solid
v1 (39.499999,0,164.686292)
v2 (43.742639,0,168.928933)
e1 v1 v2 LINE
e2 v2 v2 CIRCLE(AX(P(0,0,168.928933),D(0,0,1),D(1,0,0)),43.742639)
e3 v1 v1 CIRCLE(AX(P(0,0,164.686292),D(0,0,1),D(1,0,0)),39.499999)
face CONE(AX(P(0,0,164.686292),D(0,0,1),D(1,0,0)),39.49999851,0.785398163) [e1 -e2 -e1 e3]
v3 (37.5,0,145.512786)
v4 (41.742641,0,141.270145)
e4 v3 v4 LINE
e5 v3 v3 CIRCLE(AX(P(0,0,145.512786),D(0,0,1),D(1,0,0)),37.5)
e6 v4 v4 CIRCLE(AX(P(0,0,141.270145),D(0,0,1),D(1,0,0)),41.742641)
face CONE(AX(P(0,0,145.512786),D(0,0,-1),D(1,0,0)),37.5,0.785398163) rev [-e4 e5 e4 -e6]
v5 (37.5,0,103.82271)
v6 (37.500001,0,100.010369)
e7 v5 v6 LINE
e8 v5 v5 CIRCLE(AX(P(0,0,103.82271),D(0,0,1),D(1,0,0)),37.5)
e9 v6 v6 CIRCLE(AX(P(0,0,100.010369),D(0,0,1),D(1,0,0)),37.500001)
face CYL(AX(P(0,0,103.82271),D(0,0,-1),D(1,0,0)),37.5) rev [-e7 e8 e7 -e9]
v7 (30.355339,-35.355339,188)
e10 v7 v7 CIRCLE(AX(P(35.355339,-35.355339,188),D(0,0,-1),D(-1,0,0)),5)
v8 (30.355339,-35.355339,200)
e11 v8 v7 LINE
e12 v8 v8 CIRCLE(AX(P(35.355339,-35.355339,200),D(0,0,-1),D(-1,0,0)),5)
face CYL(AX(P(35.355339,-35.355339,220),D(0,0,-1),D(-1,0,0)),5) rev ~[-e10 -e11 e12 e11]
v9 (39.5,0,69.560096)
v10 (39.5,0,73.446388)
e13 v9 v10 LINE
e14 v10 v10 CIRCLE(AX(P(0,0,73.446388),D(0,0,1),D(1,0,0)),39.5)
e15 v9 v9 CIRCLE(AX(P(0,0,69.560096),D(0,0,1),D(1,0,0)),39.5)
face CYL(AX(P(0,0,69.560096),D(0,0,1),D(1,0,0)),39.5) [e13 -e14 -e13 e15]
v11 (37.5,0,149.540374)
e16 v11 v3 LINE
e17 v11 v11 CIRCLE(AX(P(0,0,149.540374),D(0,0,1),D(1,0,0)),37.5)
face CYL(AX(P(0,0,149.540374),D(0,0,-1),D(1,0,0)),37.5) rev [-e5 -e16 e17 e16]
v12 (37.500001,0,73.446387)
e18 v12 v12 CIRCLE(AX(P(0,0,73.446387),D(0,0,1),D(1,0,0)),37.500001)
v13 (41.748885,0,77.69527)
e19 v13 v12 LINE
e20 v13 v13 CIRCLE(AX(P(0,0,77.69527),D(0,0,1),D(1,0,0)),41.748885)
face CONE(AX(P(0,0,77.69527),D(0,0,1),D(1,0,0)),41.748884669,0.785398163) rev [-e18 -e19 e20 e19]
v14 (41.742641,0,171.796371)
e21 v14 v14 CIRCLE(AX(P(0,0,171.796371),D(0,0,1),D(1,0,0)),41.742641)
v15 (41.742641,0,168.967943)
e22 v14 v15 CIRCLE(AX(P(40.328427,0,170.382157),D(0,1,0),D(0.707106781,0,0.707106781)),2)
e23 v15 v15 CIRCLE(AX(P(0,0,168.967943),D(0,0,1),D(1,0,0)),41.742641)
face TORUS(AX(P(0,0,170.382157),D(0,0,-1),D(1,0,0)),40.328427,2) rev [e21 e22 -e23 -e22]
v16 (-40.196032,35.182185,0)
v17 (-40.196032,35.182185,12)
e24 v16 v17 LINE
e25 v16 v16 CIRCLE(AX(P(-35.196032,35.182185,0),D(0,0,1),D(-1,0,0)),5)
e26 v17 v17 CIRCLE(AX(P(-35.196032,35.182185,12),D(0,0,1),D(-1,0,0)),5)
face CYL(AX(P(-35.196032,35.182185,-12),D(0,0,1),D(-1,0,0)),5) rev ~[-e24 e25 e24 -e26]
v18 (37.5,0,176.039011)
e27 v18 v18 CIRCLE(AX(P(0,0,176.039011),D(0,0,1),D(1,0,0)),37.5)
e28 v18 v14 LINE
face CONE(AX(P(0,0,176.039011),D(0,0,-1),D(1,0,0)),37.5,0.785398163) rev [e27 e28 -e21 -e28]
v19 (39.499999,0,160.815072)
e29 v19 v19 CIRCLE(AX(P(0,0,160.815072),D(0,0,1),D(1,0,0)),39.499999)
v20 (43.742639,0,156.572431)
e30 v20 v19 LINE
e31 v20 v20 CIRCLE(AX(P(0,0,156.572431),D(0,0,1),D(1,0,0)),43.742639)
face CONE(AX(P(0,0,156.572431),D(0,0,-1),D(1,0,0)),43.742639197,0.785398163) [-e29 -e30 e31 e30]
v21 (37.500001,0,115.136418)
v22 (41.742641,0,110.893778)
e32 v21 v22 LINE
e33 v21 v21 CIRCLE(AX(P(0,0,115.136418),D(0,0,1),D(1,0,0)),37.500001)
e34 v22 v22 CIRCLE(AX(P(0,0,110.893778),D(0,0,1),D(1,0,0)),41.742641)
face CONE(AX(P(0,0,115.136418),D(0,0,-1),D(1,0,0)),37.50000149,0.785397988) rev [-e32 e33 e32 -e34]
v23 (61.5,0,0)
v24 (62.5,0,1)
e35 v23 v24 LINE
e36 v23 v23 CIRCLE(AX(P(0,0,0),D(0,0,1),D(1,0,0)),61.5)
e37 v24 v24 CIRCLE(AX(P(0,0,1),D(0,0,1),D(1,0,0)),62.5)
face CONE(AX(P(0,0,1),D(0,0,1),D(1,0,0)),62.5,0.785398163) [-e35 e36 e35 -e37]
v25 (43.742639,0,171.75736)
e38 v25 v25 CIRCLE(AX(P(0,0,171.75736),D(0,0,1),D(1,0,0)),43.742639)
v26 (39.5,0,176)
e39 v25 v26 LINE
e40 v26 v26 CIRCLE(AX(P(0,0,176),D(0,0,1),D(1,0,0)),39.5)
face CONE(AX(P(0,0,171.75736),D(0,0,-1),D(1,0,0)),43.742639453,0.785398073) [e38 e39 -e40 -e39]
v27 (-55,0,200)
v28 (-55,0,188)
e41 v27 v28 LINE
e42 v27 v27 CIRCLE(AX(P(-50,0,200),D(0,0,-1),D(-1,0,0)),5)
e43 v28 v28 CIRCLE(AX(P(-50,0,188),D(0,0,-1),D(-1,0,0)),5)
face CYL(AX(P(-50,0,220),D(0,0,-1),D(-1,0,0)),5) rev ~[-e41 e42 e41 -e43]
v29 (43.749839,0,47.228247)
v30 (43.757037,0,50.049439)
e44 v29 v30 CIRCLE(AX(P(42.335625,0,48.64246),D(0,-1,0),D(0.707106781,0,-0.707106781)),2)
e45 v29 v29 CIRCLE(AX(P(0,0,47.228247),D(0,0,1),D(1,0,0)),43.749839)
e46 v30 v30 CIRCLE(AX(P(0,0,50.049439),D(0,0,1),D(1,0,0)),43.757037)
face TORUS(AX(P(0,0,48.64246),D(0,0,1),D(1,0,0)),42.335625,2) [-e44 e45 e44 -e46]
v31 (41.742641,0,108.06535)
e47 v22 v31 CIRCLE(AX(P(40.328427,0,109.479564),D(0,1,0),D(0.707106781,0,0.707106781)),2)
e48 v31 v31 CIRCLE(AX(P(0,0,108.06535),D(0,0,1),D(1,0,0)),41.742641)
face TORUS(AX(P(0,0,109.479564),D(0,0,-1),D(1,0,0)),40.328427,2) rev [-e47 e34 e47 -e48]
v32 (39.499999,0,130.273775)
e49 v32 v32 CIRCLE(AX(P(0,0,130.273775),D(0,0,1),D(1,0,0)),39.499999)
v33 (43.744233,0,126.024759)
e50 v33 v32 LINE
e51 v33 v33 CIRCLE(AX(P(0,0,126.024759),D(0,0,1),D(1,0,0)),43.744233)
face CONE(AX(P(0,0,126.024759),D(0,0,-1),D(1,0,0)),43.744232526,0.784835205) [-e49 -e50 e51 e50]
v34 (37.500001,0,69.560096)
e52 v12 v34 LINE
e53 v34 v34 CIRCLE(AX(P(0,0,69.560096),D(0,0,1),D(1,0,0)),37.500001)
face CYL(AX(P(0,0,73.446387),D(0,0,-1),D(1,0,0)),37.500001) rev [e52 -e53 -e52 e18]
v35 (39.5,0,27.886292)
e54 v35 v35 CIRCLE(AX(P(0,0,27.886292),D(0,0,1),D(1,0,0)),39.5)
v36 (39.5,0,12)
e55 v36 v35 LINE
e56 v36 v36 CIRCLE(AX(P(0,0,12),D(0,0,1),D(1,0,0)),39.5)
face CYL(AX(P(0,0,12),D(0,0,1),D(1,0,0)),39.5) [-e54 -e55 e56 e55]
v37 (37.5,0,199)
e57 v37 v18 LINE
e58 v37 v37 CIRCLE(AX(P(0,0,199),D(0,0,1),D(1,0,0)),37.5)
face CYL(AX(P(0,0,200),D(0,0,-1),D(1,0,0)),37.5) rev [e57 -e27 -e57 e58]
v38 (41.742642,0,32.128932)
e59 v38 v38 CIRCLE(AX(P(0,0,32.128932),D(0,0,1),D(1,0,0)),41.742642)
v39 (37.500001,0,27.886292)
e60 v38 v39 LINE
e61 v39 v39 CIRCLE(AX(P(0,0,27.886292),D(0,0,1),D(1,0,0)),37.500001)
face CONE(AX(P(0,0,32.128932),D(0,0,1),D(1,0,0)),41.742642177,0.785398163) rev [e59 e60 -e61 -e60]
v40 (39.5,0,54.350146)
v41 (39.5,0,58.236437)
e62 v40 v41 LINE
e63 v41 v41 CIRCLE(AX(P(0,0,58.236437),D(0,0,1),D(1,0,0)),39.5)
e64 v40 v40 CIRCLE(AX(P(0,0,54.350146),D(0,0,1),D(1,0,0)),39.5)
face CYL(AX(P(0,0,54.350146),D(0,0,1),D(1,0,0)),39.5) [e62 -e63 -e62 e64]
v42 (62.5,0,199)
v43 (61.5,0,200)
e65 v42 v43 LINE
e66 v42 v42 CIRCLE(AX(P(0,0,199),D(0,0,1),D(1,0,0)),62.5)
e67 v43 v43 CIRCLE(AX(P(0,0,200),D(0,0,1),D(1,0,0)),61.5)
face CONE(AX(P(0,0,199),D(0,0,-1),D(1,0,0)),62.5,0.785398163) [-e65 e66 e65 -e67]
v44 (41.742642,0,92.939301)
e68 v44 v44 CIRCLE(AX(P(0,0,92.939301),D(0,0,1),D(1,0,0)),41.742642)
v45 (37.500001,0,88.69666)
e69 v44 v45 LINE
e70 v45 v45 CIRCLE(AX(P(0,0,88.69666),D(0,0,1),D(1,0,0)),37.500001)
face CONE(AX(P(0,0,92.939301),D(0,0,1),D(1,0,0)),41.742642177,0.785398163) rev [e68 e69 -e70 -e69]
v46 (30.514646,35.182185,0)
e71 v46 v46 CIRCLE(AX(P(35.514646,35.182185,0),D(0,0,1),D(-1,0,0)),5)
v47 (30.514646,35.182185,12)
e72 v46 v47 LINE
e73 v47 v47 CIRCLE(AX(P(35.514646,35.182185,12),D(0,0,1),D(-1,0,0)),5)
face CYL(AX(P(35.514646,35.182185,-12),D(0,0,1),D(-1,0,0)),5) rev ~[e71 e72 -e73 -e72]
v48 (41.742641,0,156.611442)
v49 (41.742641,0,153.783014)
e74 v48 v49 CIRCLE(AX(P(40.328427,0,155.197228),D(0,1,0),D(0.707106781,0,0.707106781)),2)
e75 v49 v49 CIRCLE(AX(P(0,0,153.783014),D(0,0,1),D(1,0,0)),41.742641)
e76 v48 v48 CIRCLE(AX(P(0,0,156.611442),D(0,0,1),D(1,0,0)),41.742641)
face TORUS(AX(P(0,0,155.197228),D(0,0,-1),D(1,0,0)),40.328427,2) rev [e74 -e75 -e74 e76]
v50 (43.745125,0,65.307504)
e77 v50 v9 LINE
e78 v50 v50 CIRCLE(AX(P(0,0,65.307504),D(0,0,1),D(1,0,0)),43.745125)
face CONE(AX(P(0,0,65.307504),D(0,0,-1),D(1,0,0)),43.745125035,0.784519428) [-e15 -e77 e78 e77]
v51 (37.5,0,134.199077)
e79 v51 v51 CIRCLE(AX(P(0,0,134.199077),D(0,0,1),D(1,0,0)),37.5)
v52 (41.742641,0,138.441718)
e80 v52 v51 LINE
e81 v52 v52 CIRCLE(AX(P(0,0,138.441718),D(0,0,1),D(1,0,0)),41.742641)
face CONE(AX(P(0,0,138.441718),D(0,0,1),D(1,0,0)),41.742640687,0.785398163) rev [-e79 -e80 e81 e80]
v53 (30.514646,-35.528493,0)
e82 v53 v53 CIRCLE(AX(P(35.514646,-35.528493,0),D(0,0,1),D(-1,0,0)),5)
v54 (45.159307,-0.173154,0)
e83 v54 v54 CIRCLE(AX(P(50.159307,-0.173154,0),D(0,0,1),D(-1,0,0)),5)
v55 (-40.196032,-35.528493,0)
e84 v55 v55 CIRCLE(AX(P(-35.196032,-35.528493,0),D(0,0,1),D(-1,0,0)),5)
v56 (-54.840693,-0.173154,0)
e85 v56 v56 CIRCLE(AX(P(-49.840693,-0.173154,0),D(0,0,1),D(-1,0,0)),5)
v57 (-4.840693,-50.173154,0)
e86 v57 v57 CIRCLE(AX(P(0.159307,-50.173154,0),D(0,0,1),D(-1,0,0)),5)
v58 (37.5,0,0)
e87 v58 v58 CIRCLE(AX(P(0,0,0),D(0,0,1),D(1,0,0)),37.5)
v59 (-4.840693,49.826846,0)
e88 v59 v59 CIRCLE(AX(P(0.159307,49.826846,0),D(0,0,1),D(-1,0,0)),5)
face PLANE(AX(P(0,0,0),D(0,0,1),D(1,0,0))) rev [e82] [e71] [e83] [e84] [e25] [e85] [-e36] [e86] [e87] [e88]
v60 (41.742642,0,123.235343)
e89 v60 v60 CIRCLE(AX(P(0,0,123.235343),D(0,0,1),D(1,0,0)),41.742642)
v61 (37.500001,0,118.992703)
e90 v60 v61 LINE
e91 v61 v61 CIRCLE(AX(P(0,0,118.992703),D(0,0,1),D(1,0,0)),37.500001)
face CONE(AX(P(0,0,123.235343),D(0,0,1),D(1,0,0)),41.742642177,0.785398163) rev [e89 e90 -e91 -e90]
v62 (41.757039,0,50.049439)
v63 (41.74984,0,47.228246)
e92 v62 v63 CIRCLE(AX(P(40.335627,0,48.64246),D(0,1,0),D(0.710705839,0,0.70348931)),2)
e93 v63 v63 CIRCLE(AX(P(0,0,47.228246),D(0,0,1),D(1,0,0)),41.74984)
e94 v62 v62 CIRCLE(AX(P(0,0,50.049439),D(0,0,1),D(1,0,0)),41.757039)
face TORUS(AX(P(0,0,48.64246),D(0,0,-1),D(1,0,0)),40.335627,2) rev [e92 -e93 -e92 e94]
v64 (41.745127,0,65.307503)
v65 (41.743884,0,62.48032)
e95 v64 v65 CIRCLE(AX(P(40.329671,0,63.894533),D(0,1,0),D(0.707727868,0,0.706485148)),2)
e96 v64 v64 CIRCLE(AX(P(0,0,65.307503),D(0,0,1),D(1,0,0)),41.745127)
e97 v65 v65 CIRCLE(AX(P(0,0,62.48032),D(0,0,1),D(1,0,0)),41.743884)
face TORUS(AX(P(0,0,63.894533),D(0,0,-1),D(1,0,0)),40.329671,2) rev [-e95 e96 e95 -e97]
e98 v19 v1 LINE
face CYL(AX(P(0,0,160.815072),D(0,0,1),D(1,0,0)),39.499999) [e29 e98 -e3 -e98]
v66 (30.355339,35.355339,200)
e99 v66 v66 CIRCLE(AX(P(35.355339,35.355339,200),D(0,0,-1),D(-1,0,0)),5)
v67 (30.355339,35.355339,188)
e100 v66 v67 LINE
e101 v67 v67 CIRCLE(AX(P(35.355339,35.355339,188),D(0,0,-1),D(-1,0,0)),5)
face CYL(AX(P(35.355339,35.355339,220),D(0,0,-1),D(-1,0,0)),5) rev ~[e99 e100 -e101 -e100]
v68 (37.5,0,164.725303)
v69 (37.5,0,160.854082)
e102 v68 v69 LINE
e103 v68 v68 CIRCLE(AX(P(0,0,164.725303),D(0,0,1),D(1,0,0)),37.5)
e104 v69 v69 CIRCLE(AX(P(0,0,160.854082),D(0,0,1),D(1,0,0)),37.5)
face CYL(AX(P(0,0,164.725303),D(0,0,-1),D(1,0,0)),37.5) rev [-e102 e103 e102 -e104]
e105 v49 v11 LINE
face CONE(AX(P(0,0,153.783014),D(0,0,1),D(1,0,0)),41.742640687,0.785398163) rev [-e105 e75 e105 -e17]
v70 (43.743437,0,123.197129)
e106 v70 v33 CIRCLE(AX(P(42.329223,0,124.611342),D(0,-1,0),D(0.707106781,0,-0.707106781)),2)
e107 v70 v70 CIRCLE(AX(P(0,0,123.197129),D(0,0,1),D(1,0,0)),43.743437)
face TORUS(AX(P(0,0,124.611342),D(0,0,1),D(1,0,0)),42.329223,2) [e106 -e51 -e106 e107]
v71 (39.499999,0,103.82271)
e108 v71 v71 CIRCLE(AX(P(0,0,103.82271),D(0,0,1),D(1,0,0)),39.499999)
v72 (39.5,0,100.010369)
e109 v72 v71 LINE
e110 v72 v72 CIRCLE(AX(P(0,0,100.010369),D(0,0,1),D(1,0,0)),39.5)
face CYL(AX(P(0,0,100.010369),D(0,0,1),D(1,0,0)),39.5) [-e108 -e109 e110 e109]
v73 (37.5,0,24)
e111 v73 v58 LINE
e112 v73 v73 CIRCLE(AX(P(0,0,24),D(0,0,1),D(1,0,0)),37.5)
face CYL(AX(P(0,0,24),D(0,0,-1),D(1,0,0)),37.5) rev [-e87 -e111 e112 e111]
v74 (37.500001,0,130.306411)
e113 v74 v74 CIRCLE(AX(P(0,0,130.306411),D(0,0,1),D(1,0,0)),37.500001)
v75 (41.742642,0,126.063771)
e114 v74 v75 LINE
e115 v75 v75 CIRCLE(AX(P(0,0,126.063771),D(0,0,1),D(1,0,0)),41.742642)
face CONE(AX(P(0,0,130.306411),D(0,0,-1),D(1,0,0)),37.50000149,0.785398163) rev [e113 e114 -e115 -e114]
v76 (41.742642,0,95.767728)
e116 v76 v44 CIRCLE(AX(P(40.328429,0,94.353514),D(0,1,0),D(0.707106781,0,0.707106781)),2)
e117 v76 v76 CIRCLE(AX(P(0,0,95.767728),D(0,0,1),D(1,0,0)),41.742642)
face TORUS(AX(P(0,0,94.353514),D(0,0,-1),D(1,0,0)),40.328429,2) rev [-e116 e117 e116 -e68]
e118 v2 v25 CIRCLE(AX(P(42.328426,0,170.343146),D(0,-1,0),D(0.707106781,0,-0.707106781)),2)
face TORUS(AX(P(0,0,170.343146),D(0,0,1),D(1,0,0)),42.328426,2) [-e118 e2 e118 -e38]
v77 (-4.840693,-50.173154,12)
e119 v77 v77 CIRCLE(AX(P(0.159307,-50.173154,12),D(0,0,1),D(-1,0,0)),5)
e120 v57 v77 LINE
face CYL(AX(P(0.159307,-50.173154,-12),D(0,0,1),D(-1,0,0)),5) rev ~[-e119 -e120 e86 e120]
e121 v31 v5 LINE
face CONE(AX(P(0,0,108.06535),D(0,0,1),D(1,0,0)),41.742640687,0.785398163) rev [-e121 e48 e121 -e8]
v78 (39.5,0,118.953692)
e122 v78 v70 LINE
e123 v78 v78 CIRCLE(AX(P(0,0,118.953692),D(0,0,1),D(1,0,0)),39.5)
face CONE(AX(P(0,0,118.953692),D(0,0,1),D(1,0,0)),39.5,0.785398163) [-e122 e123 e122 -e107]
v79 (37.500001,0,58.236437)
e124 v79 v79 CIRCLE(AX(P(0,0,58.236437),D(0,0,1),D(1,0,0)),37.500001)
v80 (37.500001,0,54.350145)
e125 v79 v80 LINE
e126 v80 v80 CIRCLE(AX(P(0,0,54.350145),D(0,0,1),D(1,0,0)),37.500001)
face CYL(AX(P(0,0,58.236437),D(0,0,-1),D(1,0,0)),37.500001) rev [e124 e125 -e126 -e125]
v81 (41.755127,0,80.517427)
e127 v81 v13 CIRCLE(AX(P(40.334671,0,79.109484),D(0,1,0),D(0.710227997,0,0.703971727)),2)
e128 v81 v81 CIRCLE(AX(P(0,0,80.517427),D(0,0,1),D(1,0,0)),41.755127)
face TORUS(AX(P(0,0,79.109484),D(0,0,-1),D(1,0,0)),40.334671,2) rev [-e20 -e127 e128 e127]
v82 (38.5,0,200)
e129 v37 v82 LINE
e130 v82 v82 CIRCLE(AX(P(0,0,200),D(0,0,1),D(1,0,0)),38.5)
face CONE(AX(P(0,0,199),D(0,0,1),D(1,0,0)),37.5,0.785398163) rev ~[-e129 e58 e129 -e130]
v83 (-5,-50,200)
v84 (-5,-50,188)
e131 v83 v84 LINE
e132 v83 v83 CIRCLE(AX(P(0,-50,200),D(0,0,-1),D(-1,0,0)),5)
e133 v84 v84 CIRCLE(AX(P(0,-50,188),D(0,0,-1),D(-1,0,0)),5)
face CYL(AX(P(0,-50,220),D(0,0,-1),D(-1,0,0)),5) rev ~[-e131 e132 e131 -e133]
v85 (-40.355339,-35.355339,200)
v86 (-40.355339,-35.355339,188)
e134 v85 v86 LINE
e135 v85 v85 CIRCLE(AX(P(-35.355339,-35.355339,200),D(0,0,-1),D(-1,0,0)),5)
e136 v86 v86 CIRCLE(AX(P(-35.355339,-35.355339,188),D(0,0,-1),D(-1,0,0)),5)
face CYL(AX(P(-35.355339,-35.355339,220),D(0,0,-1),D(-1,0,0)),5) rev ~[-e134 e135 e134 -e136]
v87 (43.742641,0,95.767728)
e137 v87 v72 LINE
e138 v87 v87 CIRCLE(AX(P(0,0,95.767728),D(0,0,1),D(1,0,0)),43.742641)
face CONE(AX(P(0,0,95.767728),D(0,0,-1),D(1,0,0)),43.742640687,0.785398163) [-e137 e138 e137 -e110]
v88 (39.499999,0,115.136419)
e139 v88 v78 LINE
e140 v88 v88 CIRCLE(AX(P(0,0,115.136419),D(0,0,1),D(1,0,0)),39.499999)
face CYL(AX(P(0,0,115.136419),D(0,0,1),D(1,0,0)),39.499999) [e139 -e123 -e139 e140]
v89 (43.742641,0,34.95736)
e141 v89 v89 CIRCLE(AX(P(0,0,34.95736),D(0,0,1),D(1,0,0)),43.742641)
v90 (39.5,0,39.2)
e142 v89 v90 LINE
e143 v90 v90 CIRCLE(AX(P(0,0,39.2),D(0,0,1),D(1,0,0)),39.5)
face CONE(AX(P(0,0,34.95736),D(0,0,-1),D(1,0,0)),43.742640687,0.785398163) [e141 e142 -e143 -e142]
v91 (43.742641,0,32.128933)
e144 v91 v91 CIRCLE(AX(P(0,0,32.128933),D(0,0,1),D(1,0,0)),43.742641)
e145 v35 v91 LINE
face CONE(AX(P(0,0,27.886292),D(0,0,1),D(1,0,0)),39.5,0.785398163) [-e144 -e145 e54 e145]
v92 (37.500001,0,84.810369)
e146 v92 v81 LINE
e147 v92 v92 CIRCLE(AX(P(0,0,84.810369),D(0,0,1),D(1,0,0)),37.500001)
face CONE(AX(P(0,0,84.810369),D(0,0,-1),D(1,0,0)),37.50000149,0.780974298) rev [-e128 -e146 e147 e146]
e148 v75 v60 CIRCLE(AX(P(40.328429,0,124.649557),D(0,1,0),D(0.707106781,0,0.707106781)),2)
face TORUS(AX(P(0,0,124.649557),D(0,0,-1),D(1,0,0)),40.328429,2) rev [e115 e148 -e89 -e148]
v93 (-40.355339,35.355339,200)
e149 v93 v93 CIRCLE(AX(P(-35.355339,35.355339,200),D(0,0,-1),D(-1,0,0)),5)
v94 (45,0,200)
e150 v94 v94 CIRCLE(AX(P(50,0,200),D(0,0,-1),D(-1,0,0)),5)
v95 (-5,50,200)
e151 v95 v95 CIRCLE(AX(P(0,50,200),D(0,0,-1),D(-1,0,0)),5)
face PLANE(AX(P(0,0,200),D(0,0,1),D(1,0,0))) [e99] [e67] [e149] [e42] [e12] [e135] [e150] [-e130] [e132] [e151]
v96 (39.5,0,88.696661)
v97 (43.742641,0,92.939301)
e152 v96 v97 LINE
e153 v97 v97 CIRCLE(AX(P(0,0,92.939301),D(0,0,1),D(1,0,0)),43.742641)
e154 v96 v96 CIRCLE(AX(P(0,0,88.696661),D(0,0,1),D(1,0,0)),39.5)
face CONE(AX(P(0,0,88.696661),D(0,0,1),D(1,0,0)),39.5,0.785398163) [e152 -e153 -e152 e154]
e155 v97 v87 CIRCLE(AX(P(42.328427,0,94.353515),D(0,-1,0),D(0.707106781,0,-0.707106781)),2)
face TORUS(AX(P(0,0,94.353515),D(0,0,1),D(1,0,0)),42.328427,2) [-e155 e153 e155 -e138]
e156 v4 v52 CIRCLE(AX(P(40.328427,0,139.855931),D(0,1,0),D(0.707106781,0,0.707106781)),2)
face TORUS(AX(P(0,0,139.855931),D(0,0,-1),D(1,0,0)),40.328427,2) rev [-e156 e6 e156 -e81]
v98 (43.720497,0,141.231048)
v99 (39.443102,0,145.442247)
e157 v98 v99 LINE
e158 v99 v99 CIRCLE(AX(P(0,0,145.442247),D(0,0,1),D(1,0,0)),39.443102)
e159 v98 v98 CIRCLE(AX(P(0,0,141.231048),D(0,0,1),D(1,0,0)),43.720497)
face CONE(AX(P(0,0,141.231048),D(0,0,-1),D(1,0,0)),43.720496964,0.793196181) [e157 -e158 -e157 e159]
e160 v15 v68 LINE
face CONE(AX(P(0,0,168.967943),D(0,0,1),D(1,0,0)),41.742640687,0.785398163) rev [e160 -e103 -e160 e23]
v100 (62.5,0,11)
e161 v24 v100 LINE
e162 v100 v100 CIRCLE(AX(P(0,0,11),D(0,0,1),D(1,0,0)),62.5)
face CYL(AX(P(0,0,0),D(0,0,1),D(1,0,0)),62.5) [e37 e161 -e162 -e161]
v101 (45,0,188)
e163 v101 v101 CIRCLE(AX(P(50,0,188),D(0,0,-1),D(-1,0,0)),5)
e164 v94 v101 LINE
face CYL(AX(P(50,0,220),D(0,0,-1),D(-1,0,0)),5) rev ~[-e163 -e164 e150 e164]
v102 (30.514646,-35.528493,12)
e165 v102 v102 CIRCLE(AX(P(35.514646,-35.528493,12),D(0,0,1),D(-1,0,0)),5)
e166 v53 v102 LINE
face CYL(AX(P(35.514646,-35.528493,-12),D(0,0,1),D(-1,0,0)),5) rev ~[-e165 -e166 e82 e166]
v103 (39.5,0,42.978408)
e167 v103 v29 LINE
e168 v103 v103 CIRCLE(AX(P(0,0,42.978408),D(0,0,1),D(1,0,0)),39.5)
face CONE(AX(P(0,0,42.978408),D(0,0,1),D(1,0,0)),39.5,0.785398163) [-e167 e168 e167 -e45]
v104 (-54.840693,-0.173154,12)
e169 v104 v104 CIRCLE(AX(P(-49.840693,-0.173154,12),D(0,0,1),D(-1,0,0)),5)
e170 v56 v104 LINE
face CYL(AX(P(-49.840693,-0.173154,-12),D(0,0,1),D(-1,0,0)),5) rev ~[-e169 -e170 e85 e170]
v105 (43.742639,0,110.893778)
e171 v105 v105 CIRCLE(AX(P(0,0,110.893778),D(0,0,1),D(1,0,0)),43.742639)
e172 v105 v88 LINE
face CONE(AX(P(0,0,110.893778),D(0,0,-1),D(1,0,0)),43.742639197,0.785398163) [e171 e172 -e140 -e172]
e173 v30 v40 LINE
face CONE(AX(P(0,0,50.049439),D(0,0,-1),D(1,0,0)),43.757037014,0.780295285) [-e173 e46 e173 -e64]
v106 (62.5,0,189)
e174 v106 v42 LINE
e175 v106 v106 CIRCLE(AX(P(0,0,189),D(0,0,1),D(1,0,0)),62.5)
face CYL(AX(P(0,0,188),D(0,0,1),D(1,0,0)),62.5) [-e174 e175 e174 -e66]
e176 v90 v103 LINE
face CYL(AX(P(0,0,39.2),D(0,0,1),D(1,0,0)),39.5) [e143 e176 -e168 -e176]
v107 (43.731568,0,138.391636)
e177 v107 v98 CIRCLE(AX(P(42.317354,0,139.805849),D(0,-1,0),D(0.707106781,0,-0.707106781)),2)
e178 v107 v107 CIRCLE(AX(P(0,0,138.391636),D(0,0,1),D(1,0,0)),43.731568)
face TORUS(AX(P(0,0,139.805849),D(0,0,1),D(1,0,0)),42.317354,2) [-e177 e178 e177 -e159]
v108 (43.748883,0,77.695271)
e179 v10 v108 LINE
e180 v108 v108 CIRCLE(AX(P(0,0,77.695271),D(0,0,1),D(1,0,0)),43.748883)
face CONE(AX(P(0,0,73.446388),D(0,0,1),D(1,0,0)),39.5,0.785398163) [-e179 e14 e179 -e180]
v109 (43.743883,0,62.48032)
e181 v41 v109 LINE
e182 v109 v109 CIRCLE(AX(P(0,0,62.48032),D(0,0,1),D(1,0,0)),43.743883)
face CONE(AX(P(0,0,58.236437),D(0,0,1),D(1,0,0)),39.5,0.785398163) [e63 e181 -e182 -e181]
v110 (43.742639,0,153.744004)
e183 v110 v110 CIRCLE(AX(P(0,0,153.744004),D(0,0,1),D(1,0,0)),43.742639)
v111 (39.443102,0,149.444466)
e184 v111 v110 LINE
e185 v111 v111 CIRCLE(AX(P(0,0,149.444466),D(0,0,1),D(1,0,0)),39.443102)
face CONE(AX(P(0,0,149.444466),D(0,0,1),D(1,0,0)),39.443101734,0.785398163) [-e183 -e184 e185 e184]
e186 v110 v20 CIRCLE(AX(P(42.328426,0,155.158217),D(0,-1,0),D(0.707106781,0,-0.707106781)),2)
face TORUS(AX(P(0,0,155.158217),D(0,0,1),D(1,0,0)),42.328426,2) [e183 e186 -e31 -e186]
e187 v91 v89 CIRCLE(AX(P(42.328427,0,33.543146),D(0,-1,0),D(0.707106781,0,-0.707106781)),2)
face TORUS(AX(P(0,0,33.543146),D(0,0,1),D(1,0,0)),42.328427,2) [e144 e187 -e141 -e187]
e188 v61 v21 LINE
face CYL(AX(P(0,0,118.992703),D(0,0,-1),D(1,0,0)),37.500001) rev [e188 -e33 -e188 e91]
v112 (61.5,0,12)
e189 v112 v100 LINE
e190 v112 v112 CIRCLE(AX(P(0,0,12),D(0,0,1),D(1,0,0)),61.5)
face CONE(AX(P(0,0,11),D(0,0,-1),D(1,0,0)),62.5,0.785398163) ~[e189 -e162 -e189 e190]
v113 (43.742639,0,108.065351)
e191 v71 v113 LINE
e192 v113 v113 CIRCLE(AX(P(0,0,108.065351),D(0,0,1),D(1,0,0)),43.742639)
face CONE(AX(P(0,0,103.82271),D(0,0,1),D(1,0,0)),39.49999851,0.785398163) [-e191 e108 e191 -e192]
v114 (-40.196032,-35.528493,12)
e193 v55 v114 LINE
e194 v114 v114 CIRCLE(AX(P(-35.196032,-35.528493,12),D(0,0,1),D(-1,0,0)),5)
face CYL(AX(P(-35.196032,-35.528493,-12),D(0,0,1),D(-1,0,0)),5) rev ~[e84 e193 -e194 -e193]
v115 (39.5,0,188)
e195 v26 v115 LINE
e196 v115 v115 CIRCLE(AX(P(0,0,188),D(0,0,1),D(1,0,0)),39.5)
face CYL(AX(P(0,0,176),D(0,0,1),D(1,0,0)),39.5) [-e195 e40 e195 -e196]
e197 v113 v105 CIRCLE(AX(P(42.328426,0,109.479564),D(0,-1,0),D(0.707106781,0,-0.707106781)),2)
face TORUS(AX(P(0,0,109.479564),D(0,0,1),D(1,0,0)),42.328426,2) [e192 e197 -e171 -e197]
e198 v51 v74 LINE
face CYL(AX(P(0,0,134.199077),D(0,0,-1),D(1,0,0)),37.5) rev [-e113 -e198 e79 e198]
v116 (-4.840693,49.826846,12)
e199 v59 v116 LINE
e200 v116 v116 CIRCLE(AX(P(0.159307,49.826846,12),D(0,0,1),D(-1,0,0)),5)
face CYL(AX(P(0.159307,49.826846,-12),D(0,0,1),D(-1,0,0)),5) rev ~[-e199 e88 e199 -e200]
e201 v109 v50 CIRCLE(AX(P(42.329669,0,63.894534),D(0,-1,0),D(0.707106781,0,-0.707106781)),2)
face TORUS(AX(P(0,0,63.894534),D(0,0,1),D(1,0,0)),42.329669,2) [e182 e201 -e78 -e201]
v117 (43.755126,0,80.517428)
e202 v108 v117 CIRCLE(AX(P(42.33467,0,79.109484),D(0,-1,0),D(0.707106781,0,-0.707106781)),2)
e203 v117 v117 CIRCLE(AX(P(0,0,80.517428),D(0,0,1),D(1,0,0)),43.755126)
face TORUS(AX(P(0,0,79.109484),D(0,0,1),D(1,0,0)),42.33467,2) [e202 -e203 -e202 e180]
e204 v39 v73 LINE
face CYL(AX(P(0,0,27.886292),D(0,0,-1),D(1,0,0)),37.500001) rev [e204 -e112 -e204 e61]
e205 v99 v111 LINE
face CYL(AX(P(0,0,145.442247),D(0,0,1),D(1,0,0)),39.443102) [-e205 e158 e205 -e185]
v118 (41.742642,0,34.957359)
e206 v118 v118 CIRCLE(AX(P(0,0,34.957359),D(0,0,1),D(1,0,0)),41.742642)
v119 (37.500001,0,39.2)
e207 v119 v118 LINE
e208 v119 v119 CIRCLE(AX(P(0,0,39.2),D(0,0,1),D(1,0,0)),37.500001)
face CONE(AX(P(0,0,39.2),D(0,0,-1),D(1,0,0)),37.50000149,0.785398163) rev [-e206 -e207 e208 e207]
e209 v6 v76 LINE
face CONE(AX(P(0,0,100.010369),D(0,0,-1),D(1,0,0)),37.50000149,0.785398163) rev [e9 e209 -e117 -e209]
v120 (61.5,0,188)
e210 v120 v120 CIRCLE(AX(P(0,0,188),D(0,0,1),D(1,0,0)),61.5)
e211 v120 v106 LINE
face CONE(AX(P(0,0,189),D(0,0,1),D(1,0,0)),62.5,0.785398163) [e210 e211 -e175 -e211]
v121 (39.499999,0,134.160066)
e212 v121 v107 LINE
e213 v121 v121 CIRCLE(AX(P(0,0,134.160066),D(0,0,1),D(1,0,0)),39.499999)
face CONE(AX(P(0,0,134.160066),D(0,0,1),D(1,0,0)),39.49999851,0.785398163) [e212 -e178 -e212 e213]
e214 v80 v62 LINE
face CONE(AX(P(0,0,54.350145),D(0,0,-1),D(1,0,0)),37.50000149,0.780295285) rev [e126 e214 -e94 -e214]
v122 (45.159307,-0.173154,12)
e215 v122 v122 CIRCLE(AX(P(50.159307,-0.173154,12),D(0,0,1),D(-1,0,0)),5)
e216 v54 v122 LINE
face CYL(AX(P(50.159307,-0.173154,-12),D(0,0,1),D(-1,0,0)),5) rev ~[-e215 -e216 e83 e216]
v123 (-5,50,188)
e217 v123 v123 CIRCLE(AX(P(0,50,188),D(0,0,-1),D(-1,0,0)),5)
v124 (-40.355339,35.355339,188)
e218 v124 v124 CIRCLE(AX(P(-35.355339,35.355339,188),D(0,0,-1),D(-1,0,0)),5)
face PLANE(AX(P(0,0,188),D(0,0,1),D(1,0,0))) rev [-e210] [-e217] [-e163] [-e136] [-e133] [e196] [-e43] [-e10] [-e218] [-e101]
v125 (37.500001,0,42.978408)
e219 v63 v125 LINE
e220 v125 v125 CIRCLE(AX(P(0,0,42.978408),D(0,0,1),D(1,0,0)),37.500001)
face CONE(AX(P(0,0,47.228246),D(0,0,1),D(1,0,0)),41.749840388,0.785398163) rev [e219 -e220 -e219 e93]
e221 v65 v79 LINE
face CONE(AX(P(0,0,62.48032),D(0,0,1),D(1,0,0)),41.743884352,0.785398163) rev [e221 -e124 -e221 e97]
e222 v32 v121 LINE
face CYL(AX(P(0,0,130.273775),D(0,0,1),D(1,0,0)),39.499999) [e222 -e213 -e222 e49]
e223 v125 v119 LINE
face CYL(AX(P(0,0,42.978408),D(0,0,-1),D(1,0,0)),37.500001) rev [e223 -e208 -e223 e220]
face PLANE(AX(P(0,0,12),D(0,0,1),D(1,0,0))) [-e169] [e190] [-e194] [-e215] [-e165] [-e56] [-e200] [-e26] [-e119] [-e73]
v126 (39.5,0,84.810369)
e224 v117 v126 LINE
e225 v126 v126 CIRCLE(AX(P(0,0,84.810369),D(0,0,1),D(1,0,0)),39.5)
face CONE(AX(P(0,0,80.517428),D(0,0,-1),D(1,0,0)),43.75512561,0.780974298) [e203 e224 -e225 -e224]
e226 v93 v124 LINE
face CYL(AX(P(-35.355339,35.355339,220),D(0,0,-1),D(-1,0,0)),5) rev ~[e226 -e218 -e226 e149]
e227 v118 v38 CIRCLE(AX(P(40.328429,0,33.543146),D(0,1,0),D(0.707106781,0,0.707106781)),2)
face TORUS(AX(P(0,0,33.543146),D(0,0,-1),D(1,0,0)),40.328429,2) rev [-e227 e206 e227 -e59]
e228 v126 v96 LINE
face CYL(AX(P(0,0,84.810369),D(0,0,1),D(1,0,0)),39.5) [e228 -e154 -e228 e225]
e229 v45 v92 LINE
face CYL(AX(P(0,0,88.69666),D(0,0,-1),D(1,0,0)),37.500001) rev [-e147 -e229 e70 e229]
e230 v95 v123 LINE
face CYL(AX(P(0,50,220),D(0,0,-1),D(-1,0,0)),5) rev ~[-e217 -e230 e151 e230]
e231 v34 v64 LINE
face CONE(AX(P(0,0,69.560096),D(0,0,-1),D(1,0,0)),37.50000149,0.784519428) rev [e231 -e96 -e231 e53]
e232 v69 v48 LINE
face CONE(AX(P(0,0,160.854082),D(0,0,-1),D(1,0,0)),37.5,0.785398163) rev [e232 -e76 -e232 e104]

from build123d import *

# Parameters (mm, degrees)
F3_D     = 10
F3_DEPTH = 20
F3_TIP   = 3.0043030951
F5_D     = 10
F5_DEPTH = 12
F5_TIP   = 3.0043030951
F6_SIZE  = 1


# Not quite as in the source:
# - ends of sketch curves that miss each other by under 0.0002 mm in the source are joined
# - a feature names something its author has since deleted; it is built from what else it names


with BuildPart() as f1:
    # F0 (on Front) → F1 (revolve)
    with BuildSketch(Plane.XZ):
        Polygon((37.5, 200), (37.5, 188), (39.5, 188), (49.1224490106, 188), (62.5, 188), (62.5, 200), align=None)
        Polygon((37.5, 12), (37.5, 0), (62.5, 0), (62.5, 12), (39.5, 12), align=None)
        with BuildLine():
            Line((37.5, 24), (37.5, 12))
            Line((37.5, 12), (39.5, 12))
            Line((39.5, 12), (39.5, 24))
            Line((39.5, 24), (39.5, 27.8862919658))
            Line((39.5, 27.8862919658), (43.7426406871, 32.128932653))
            ThreePointArc((43.7426406871, 32.128932653), (44.3284271247, 33.5431462153), (43.7426406871, 34.9573597777))
            Line((43.7426406871, 34.9573597777), (39.5, 39.2000004648))
            Line((39.5, 39.2000004648), (39.5, 42.9784080237))
            Line((39.5, 42.9784080237), (43.7498388975, 47.2282469212))
            ThreePointArc((43.7498388975, 47.2282469212), (44.3356188252, 48.6373576102), (43.7570370141, 50.0494391041))
            Line((43.7570370141, 50.0494391041), (39.5, 54.350145626))
            Line((39.5, 54.350145626), (39.5, 58.236437127))
            Line((39.5, 58.236437127), (43.7438828615, 62.4803199885))
            ThreePointArc((43.7438828615, 62.4803199885), (44.329669106, 63.8936548151), (43.7451250353, 65.3075038473))
            Line((43.7451250353, 65.3075038473), (39.5, 69.5600961327))
            Line((39.5, 69.5600961327), (39.5, 73.4463876337))
            Line((39.5, 73.4463876337), (43.7488831793, 77.695270813))
            ThreePointArc((43.7488831793, 77.695270813), (44.3346647243, 79.1050605139), (43.7551256104, 80.5174278297))
            Line((43.7551256104, 80.5174278297), (39.5, 84.8103691815))
            Line((39.5, 84.8103691815), (39.5, 88.6966606826))
            Line((39.5, 88.6966606826), (43.7426406871, 92.9393013697))
            ThreePointArc((43.7426406871, 92.9393013697), (44.3284271247, 94.3535149321), (43.7426406871, 95.7677284944))
            Line((43.7426406871, 95.7677284944), (39.5, 100.0103691815))
            Line((39.5, 100.0103691815), (39.4999985099, 103.8227102011))
            Line((39.4999985099, 103.8227102011), (43.742639197, 108.0653508883))
            ThreePointArc((43.742639197, 108.0653508883), (44.3284256346, 109.4795644506), (43.742639197, 110.893778013))
            Line((43.742639197, 110.893778013), (39.4999985099, 115.1364187001))
            Line((39.4999985099, 115.1364187001), (39.5, 118.9536920041))
            Line((39.5, 118.9536920041), (43.7434366066, 123.1971286107))
            ThreePointArc((43.7434366066, 123.1971286107), (44.329222965, 124.6107792146), (43.744232526, 126.0247593679))
            Line((43.744232526, 126.0247593679), (39.4999985099, 130.2737747311))
            Line((39.4999985099, 130.2737747311), (39.4999985099, 134.1600662321))
            Line((39.4999985099, 134.1600662321), (43.7315679123, 138.3916356345))
            ThreePointArc((43.7315679123, 138.3916356345), (44.3173391477, 139.8136471942), (43.7204969642, 141.2310477108))
            Line((43.7204969642, 141.2310477108), (39.4431017339, 145.4422473907))
            Line((39.4431017339, 145.4422473907), (39.4431017339, 149.4444662482))
            Line((39.4431017339, 149.4444662482), (43.742639197, 153.7440037112))
            ThreePointArc((43.742639197, 153.7440037112), (44.3284256346, 155.1582172736), (43.742639197, 156.572430836))
            Line((43.742639197, 156.572430836), (39.4999985099, 160.8150715231))
            Line((39.4999985099, 160.8150715231), (39.4999985099, 164.6862919658))
            Line((39.4999985099, 164.6862919658), (43.7426393252, 168.9289327811))
            ThreePointArc((43.7426393252, 168.9289327811), (44.3284257628, 170.3431462529), (43.7426394533, 171.7573597777))
            Line((43.7426394533, 171.7573597777), (39.5, 176))
            Line((39.5, 176), (39.5, 188))
            Line((39.5, 188), (37.5, 188))
            Line((37.5, 188), (37.5, 176.03901124))
            Line((37.5, 176.03901124), (41.7426406871, 171.7963705529))
            ThreePointArc((41.7426406871, 171.7963705529), (42.3284271247, 170.3821569905), (41.7426406871, 168.9679434281))
            Line((41.7426406871, 168.9679434281), (37.5, 164.725302741))
            Line((37.5, 164.725302741), (37.5, 160.8540822983))
            Line((37.5, 160.8540822983), (41.7426406871, 156.6114416112))
            ThreePointArc((41.7426406871, 156.6114416112), (42.3284271247, 155.1972280488), (41.7426406871, 153.7830144864))
            Line((41.7426406871, 153.7830144864), (37.5, 149.5403737993))
            Line((37.5, 149.5403737993), (37.5, 145.5127855062))
            Line((37.5, 145.5127855062), (41.7426406871, 141.2701448191))
            ThreePointArc((41.7426406871, 141.2701448191), (42.3284271247, 139.8559312568), (41.7426406871, 138.4417176944))
            Line((41.7426406871, 138.4417176944), (37.5, 134.1990770073))
            Line((37.5, 134.1990770073), (37.5000014901, 130.3064112782))
            Line((37.5000014901, 130.3064112782), (41.7426421772, 126.0637705911))
            ThreePointArc((41.7426421772, 126.0637705911), (42.3284286149, 124.6495570288), (41.7426421772, 123.2353434664))
            Line((41.7426421772, 123.2353434664), (37.5000014901, 118.9927027793))
            Line((37.5000014901, 118.9927027793), (37.5000014901, 115.1364182353))
            Line((37.5000014901, 115.1364182353), (41.7426406871, 110.8937775482))
            ThreePointArc((41.7426406871, 110.8937775482), (42.3284271247, 109.4795639858), (41.7426406871, 108.0653504234))
            Line((41.7426406871, 108.0653504234), (37.5, 103.8227097363))
            Line((37.5, 103.8227097363), (37.5000014901, 100.0103687167))
            Line((37.5000014901, 100.0103687167), (41.7426421772, 95.7677280296))
            ThreePointArc((41.7426421772, 95.7677280296), (42.3284286149, 94.3535144672), (41.7426421772, 92.9393009049))
            Line((41.7426421772, 92.9393009049), (37.5000014901, 88.6966602177))
            Line((37.5000014901, 88.6966602177), (37.5000014901, 84.8103687167))
            Line((37.5000014901, 84.8103687167), (41.7551271005, 80.5174273649))
            ThreePointArc((41.7551271005, 80.5174273649), (42.3346662144, 79.1050600491), (41.7488846694, 77.6952703481))
            Line((41.7488846694, 77.6952703481), (37.5000014901, 73.4463871689))
            Line((37.5000014901, 73.4463871689), (37.5000014901, 69.5600956678))
            Line((37.5000014901, 69.5600956678), (41.7451265254, 65.3075033825))
            ThreePointArc((41.7451265254, 65.3075033825), (42.3296705962, 63.8936543503), (41.7438843516, 62.4803195236))
            Line((41.7438843516, 62.4803195236), (37.5000014901, 58.2364366622))
            Line((37.5000014901, 58.2364366622), (37.5000014901, 54.3501451612))
            Line((37.5000014901, 54.3501451612), (41.7570385042, 50.0494386393))
            ThreePointArc((41.7570385042, 50.0494386393), (42.3356203154, 48.6373571454), (41.7498403876, 47.2282464563))
            Line((41.7498403876, 47.2282464563), (37.5000014901, 42.9784075589))
            Line((37.5000014901, 42.9784075589), (37.5000014901, 39.2))
            Line((37.5000014901, 39.2), (41.7426421772, 34.9573593129))
            ThreePointArc((41.7426421772, 34.9573593129), (42.3284286149, 33.5431457505), (41.7426421772, 32.1289321881))
            Line((41.7426421772, 32.1289321881), (37.5000014901, 27.886291501))
            Line((37.5000014901, 27.886291501), (37.5, 24))
        make_face()
    revolve(axis=Axis((0, 0, 100), (0, 0, 1)))

    # F3
    with Locations(Plane.XY.offset(200)):
        with Locations((-50, 0), (-35.3553390593, 35.3553390593), (0, 50), (35.3553390593, 35.3553390593), (50, 0), (35.3553390593, -35.3553390593), (0, -50), (-35.3553390593, -35.3553390593)):
            Hole(F3_D / 2, depth=F3_DEPTH)
            with Locations((0, 0, -(F3_DEPTH + F3_TIP / 2))):  # 118° drill point
                Cone(0, F3_D / 2, F3_TIP, mode=Mode.SUBTRACT)

    # F5
    with Locations(Plane(origin=(0, 0, 0), x_dir=(1, 0, 0), z_dir=(0, 0, -1))):
        with Locations((0.1593066842, -49.8268464117), (-35.1960323751, -35.1821854711), (-49.8406933158, 0.1731535883), (-35.1960323751, 35.5284926476), (0.1593066842, 50.1731535883), (35.5146457436, 35.5284926476), (50.1593066842, 0.1731535883), (35.5146457436, -35.1821854711)):
            Hole(F5_D / 2, depth=F5_DEPTH)
            with Locations((0, 0, -(F5_DEPTH + F5_TIP / 2))):  # 118° drill point
                Cone(0, F5_D / 2, F5_TIP, mode=Mode.SUBTRACT)

    # F6
    f6_edges = [f1.edges().sort_by_distance(p)[0] for p in [
        (-62.5, 0, 200),
        (-37.5, 0, 200),
        (-62.5, 0, 188),
        (-62.5, 0, 12),
        (-62.5, 0, 0),
    ]]
    chamfer(f6_edges, length=F6_SIZE)


solid = f1.part
